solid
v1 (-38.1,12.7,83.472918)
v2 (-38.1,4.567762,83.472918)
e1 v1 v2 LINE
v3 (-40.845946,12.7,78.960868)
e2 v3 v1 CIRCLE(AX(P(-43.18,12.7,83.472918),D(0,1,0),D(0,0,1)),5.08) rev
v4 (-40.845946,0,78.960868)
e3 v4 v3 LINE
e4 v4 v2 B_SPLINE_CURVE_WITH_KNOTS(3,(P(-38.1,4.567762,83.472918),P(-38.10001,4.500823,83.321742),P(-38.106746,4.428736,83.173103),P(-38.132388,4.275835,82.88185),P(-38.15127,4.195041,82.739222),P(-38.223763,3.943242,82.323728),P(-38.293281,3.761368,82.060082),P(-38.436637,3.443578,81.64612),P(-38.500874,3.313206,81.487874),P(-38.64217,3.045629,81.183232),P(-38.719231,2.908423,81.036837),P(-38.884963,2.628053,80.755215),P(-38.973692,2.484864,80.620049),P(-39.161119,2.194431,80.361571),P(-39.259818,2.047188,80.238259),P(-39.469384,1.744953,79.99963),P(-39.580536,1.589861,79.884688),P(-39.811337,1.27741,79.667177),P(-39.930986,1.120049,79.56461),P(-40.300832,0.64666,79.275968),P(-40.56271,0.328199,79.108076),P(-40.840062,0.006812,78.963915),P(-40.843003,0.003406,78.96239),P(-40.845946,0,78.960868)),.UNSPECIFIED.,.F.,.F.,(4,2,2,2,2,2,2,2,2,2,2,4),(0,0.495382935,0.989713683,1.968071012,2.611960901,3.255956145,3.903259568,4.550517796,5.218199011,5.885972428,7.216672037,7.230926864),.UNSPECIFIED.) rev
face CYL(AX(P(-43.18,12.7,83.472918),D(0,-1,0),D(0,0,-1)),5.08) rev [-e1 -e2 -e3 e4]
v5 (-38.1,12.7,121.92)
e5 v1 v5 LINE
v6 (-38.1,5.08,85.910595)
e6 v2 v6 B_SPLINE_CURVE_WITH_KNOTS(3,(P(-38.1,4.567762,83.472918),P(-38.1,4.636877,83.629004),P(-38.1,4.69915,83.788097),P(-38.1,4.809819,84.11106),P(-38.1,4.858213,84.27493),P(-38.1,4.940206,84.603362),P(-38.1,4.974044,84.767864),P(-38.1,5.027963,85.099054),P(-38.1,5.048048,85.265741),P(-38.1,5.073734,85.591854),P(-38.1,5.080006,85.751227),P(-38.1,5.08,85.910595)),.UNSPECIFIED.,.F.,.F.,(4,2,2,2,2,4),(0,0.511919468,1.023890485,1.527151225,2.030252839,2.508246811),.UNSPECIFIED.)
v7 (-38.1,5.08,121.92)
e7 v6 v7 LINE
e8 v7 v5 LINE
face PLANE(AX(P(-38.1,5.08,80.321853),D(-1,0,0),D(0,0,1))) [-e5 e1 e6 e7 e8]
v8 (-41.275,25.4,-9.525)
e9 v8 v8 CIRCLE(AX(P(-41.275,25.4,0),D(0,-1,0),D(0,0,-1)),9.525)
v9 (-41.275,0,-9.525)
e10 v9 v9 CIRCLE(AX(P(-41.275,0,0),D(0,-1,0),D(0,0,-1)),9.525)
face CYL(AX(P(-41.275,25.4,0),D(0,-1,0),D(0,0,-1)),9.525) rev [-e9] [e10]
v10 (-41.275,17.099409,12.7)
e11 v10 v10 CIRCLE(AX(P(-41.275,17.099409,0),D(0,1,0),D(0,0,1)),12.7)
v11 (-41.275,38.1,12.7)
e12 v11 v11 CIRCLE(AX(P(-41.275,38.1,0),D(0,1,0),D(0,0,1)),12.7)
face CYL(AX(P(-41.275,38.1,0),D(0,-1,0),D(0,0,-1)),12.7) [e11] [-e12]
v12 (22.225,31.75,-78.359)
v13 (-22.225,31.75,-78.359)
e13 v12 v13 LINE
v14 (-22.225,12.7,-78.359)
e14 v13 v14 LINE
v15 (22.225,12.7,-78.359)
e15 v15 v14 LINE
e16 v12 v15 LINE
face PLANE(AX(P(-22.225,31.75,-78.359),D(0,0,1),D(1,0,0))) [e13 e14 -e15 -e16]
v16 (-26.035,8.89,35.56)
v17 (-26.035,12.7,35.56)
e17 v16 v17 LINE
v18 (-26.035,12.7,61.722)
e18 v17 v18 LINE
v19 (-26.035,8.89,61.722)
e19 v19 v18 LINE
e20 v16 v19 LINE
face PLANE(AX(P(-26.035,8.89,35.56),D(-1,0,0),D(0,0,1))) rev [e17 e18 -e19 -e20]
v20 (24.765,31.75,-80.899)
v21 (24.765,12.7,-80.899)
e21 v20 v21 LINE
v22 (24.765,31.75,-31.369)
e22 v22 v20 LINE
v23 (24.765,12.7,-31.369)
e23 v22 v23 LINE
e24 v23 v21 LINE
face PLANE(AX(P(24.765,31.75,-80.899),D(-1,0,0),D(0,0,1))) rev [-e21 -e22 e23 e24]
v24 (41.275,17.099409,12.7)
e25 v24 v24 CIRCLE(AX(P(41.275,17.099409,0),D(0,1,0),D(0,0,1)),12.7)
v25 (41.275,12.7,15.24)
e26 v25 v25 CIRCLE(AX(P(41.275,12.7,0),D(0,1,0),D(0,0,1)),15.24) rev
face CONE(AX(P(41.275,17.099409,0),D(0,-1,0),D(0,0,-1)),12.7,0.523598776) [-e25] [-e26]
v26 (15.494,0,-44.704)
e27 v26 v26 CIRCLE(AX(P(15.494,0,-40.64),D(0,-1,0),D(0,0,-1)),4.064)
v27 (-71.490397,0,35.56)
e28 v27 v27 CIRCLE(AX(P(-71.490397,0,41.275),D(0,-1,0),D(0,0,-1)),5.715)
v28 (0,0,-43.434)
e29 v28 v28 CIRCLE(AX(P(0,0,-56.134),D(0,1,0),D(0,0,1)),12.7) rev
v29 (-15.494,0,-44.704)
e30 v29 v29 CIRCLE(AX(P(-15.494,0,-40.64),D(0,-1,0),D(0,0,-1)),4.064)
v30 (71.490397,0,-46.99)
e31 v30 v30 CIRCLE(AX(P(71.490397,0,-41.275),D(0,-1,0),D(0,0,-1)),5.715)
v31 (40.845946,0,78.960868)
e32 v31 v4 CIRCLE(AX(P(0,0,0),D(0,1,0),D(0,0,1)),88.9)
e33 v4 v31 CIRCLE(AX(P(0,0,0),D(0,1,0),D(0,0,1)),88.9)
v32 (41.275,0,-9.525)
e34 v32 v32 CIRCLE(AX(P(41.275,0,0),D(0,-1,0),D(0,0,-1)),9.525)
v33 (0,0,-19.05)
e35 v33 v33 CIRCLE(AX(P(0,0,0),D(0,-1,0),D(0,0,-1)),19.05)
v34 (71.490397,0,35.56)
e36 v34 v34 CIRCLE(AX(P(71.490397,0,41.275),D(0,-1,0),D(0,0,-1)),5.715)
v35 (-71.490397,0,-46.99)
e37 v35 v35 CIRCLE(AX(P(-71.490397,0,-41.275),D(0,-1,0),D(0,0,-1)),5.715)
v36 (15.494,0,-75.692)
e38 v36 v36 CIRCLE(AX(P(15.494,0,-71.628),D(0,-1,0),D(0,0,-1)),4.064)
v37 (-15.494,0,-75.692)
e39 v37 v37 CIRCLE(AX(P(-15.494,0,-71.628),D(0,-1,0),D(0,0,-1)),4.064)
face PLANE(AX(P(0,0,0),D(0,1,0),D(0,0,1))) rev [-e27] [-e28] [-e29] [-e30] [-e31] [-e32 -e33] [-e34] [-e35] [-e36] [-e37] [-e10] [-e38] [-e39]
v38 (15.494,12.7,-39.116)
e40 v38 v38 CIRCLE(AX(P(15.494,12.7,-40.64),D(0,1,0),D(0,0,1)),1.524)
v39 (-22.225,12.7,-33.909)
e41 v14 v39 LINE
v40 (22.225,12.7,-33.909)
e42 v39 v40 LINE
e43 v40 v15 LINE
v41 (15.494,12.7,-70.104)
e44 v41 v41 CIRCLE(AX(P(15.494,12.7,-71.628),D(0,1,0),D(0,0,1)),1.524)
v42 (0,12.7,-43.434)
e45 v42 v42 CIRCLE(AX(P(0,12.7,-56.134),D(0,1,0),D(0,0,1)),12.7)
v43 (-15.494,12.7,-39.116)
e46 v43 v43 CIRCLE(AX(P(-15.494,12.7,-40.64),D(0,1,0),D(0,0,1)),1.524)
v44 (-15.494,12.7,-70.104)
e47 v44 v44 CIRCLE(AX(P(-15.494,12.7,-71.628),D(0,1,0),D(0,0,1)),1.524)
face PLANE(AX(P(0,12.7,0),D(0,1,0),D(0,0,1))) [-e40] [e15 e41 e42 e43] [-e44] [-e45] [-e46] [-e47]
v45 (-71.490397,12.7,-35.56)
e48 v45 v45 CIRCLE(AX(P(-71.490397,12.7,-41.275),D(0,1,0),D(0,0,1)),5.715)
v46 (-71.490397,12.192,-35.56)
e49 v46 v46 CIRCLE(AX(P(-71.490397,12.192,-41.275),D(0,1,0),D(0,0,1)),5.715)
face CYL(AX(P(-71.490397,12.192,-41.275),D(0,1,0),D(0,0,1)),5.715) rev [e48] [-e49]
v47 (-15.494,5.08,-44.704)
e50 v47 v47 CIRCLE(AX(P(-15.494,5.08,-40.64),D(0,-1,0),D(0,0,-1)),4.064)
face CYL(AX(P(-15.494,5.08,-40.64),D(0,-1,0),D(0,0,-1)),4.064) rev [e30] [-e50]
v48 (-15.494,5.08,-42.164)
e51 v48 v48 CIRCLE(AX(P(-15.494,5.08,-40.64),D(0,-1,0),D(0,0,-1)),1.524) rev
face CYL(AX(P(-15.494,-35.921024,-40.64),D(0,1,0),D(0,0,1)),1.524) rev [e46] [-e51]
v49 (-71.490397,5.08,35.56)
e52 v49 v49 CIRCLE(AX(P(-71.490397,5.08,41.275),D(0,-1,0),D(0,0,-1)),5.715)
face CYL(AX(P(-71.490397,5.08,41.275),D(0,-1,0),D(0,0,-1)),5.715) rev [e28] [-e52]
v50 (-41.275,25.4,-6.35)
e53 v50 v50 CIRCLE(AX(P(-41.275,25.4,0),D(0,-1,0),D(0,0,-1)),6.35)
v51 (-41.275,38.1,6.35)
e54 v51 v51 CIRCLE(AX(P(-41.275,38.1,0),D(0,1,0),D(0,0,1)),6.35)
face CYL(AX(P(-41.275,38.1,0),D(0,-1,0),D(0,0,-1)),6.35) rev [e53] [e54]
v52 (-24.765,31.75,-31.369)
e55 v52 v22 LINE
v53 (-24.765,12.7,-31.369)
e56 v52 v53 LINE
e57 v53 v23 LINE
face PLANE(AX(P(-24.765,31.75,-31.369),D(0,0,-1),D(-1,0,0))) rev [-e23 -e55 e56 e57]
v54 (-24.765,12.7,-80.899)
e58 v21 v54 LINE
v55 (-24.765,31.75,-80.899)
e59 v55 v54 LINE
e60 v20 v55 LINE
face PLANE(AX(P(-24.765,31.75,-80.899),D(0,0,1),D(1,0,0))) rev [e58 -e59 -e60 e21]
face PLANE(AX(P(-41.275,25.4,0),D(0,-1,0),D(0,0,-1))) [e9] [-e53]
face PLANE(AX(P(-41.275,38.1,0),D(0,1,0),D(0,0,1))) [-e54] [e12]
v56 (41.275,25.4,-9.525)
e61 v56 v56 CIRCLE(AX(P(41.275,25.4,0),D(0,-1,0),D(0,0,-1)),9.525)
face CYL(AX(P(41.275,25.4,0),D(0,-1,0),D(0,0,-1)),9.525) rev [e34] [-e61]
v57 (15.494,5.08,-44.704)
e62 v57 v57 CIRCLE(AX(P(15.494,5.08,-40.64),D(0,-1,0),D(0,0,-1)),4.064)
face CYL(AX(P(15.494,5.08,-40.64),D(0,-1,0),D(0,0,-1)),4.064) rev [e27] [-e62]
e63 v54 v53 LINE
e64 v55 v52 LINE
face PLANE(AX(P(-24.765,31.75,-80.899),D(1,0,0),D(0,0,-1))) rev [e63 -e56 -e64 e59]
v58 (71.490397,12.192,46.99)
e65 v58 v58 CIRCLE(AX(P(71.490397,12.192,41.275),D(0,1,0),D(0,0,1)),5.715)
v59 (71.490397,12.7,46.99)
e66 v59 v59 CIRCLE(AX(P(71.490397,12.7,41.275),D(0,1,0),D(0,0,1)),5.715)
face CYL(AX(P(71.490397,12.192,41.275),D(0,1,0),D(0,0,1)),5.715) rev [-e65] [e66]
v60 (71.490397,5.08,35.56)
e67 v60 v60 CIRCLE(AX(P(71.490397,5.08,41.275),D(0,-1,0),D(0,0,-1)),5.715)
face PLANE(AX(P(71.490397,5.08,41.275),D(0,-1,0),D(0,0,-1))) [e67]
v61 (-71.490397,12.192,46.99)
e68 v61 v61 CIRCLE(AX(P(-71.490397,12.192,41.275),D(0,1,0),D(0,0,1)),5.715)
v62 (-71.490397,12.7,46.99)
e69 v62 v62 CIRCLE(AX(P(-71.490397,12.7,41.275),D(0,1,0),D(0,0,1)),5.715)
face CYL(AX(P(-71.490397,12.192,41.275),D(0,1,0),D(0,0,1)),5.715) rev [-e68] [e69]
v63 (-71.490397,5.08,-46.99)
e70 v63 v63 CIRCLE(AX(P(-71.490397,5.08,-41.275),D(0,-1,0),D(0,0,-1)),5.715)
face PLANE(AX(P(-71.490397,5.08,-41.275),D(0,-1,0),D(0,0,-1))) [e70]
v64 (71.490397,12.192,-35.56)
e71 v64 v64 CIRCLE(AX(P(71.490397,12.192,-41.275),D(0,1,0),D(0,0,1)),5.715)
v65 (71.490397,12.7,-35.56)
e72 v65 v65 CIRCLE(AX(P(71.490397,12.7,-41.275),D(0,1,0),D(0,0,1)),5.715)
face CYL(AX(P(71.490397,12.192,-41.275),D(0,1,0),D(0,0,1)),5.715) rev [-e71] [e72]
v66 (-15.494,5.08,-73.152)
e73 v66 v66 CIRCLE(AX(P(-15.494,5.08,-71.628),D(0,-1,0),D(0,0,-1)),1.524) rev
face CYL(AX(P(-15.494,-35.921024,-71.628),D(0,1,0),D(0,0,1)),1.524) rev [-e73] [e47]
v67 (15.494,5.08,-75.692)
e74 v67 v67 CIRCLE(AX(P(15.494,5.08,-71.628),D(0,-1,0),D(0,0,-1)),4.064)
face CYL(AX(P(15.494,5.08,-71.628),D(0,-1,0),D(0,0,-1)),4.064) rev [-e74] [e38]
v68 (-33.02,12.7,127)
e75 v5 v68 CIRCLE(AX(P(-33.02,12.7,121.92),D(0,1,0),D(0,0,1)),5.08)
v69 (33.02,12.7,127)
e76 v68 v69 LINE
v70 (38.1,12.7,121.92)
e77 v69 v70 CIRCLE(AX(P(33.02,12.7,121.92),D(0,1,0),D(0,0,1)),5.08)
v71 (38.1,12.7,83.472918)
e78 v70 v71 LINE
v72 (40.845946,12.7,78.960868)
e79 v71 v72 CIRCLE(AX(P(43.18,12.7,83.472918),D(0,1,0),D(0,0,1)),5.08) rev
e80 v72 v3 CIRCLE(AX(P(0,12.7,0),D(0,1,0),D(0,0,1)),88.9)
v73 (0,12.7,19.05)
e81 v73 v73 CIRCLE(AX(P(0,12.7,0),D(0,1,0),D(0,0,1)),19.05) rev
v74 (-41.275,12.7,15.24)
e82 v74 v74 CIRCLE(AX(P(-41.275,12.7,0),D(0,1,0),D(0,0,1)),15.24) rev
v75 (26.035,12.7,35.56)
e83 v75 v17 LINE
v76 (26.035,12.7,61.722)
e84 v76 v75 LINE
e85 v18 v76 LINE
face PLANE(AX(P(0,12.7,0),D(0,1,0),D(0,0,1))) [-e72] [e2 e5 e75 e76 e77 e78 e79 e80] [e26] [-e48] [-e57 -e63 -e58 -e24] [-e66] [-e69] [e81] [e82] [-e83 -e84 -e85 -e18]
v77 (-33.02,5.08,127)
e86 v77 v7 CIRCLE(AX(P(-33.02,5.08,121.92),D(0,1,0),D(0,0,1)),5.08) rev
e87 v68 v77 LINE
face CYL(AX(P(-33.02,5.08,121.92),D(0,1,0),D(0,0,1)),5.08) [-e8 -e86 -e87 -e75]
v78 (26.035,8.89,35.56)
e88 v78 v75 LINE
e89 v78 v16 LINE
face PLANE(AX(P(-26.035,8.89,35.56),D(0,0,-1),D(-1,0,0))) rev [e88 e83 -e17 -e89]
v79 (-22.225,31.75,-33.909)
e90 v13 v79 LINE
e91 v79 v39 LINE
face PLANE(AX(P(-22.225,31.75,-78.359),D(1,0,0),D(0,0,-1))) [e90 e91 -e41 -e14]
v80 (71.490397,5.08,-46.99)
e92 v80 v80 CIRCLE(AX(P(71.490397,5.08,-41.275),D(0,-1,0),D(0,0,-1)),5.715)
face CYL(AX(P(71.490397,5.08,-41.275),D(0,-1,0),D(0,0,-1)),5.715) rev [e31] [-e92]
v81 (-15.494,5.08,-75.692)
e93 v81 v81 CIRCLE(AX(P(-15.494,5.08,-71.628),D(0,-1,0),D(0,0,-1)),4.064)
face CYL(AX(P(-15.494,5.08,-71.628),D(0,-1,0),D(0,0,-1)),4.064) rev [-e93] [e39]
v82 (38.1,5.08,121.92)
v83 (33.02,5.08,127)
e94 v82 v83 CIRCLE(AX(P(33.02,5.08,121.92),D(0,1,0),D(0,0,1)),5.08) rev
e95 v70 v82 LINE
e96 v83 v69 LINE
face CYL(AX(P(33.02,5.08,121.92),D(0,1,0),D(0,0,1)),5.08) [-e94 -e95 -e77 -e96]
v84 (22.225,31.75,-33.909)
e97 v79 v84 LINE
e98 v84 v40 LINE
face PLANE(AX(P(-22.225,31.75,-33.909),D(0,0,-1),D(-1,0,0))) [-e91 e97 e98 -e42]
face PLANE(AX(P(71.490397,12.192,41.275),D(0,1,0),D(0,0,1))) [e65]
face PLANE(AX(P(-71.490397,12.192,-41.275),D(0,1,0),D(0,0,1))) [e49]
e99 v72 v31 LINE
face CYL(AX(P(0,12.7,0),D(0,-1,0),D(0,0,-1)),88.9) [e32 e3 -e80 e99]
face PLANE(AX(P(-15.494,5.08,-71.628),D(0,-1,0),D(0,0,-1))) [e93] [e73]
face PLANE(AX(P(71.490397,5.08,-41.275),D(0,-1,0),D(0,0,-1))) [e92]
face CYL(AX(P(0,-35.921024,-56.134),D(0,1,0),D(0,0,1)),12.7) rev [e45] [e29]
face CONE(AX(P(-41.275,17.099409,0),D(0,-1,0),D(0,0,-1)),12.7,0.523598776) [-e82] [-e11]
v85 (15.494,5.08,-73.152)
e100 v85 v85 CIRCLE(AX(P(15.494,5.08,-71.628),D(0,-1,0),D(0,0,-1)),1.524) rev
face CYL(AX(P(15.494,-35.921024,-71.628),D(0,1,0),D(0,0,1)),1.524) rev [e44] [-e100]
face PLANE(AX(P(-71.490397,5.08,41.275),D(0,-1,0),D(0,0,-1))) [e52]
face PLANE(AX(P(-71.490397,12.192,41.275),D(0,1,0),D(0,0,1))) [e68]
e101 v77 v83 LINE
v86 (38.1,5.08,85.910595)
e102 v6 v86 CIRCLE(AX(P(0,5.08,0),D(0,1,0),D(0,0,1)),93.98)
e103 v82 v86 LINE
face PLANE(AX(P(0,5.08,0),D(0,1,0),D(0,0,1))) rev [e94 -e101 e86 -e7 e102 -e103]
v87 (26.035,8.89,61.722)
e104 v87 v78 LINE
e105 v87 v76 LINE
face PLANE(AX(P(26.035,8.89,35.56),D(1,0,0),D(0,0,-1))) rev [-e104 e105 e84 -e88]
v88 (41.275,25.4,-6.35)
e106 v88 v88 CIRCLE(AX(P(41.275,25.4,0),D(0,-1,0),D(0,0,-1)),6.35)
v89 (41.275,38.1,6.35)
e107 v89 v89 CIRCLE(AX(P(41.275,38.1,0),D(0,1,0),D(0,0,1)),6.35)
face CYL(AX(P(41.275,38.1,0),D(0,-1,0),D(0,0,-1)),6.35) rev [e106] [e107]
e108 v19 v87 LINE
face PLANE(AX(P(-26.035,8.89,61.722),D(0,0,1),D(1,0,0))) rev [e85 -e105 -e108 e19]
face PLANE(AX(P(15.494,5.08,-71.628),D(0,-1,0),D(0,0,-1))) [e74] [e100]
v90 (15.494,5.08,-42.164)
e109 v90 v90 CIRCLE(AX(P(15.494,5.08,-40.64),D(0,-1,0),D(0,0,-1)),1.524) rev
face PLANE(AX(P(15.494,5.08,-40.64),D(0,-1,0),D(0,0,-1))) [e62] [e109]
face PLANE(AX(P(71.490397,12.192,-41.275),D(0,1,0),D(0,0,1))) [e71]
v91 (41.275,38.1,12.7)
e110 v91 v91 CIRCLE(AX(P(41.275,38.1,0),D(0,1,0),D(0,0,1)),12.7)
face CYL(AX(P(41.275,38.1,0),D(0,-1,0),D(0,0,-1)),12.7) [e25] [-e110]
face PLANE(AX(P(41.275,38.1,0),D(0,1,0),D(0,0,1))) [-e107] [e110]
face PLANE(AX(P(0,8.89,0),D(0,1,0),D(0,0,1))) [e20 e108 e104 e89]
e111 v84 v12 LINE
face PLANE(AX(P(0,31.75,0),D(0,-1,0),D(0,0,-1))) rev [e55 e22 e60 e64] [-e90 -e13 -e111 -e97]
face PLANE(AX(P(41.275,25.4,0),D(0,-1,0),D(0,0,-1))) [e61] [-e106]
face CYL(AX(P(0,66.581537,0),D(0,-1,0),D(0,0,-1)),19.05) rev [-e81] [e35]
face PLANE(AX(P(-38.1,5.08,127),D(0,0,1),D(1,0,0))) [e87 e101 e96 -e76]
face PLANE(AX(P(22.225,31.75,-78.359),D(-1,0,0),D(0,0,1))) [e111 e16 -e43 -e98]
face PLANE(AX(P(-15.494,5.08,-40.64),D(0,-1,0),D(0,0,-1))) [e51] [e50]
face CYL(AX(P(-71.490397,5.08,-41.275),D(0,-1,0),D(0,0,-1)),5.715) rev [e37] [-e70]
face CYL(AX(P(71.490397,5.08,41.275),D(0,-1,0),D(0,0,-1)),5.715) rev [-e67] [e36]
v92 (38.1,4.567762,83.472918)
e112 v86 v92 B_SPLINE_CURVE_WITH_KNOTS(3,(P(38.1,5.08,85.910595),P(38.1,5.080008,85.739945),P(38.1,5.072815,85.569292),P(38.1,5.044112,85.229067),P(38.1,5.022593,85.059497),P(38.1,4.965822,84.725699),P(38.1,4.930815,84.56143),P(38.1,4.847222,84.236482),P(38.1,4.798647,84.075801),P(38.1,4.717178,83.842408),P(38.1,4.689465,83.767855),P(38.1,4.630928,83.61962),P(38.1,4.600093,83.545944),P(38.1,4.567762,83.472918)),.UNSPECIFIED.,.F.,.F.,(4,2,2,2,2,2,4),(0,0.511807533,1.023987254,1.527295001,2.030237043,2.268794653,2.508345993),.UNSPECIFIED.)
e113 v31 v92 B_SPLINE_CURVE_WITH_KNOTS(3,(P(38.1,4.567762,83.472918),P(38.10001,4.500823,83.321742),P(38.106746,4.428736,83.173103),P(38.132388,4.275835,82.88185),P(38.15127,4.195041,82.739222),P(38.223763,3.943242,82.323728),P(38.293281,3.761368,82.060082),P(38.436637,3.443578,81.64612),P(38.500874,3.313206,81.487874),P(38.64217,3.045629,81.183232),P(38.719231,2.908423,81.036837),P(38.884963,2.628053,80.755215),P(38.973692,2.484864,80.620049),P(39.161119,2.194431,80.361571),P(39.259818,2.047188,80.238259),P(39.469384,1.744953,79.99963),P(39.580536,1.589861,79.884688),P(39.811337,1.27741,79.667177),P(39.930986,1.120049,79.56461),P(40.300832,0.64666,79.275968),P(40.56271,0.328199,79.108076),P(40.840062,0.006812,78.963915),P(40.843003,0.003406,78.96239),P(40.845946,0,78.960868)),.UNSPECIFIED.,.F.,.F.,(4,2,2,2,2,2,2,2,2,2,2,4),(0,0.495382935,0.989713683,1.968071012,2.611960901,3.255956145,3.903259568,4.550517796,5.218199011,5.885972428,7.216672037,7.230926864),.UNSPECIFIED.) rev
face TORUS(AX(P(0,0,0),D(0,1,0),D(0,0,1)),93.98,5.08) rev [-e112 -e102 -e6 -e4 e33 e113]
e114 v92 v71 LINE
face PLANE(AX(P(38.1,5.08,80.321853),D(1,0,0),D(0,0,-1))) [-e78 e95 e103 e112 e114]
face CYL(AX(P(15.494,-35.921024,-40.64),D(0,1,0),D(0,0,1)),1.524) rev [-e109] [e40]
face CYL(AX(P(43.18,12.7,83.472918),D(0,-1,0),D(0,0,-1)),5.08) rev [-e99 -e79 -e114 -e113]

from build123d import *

# Parameters (mm, degrees)
SKETCH1_R           = 88.9
BOSS_EXTRUDE1_DEPTH = 12.7
SKETCH9_W           = 49.53
SKETCH9_H           = 49.53
SKETCH9_W_2         = 44.45
SKETCH9_H_2         = 44.45
BOSS_EXTRUDE2_DEPTH = 19.05
SKETCH10_R          = 5.715
CUT_EXTRUDE7_DEPTH  = 0.508
SKETCH14_R          = 19.05
CUT_EXTRUDE11_DEPTH = 12.7
SKETCH15_R          = 12.7
SKETCH15_R_2        = 6.35
BOSS_EXTRUDE3_DEPTH = 25.4
CUT_EXTRUDE12_START = -12.7
SKETCH16_R          = 6.35
CUT_EXTRUDE12_DEPTH = 12.7
SKETCH17_R          = 9.525
CUT_EXTRUDE13_DEPTH = 25.4
CHAMFER2_SIZE       = 2.54
CHAMFER2_SIZE2      = 4.399409051
SKETCH19_R          = 12.7
SKETCH19_R_2        = 1.524
CUT_EXTRUDE14_DEPTH = 12.7
CUT_EXTRUDE15_START = -5.08
SKETCH21_R          = 4.064
SKETCH21_R_2        = 5.715
CUT_EXTRUDE15_DEPTH = 5.08
SKETCH22_W          = 52.07
SKETCH22_H          = 26.162
CUT_EXTRUDE17_DEPTH = 3.81
BOSS_EXTRUDE5_START = -7.62
BOSS_EXTRUDE5_DEPTH = 7.62
FILLET2_R           = 5.08


with BuildPart() as part:
    # Sketch1 → Boss-Extrude1 (new body)
    with BuildSketch(Plane(origin=(0, 0, 0), x_dir=(1, 0, 0), z_dir=(0, 1, 0))):
        with Locations(Location((0, 0, 0), (0, 0, 270))):
            Circle(SKETCH1_R)
    extrude(amount=BOSS_EXTRUDE1_DEPTH)

    # Sketch9 → Boss-Extrude2 (add)
    with BuildSketch(Plane(origin=(0, 12.7, 0), x_dir=(1, 0, 0), z_dir=(0, 1, 0))):
        with Locations((0, 56.134)):
            Rectangle(SKETCH9_W, SKETCH9_H)
        with Locations((0, 56.134)):
            Rectangle(SKETCH9_W_2, SKETCH9_H_2, mode=Mode.SUBTRACT)
    extrude(amount=BOSS_EXTRUDE2_DEPTH)

    # Sketch10 → Cut-Extrude7 (cut)
    with BuildSketch(Plane(origin=(0, 12.7, 0), x_dir=(1, 0, 0), z_dir=(0, 1, 0))):
        with Locations(Location((-71.490397082, -41.275, 0), (0, 0, 270))):
            Circle(SKETCH10_R)
        with Locations(Location((-71.490397082, 41.275, 0), (0, 0, 270))):
            Circle(SKETCH10_R)
        with Locations(Location((71.490397082, 41.275, 0), (0, 0, 270))):
            Circle(SKETCH10_R)
        with Locations(Location((71.490397082, -41.275, 0), (0, 0, 270))):
            Circle(SKETCH10_R)
    extrude(amount=-CUT_EXTRUDE7_DEPTH, mode=Mode.SUBTRACT)

    # Sketch14 → Cut-Extrude11 (cut)
    with BuildSketch(Plane.XZ):
        with Locations(Location((0, 0, 0), (0, 0, 270))):
            Circle(SKETCH14_R)
    extrude(amount=-CUT_EXTRUDE11_DEPTH, mode=Mode.SUBTRACT)

    # Sketch15 → Boss-Extrude3 (add)
    # profile 1 of 2: a face of its own
    with BuildSketch(Plane(origin=(0, 12.7, 0), x_dir=(1, 0, 0), z_dir=(0, 1, 0))):
        with Locations(Location((-41.275, 0, 0), (0, 0, 270))):
            Circle(SKETCH15_R)
        with Locations(Location((-41.275, 0, 0), (0, 0, 270))):
            Circle(SKETCH15_R_2, mode=Mode.SUBTRACT)
    # profile 2 of 2: a face of its own
    with BuildSketch(Plane(origin=(0, 12.7, 0), x_dir=(1, 0, 0), z_dir=(0, 1, 0))):
        with Locations(Location((41.275, 0, 0), (0, 0, 270))):
            Circle(SKETCH15_R)
        with Locations(Location((41.275, 0, 0), (0, 0, 270))):
            Circle(SKETCH15_R_2, mode=Mode.SUBTRACT)
    extrude(amount=BOSS_EXTRUDE3_DEPTH)

    # Sketch16 → Cut-Extrude12 (cut)
    with BuildSketch(Plane(origin=(0, 12.7, 0), x_dir=(1, 0, 0), z_dir=(0, 1, 0)).offset(CUT_EXTRUDE12_START)):
        with Locations(Location((41.275, 0, 0), (0, 0, 270))):
            Circle(SKETCH16_R)
        with Locations(Location((-41.275, 0, 0), (0, 0, 270))):
            Circle(SKETCH16_R)
    extrude(amount=CUT_EXTRUDE12_DEPTH, mode=Mode.SUBTRACT)

    # Sketch17 → Cut-Extrude13 (cut)
    with BuildSketch(Plane.XZ):
        with Locations(Location((41.275, 0, 0), (0, 0, 270))):
            Circle(SKETCH17_R)
        with Locations(Location((-41.275, 0, 0), (0, 0, 270))):
            Circle(SKETCH17_R)
    extrude(amount=-CUT_EXTRUDE13_DEPTH, mode=Mode.SUBTRACT)

    # Chamfer2
    chamfer2_edges = [part.edges().sort_by_distance(p)[0] for p in [
        (-41.275, 12.7, -12.7),
        (41.275, 12.7, -12.7),
    ]]
    chamfer2_side = [part.faces().sort_by_distance(p)[0] for p in [
        (0, 12.7, -86.385528286),
    ]]
    chamfer(chamfer2_edges, length=CHAMFER2_SIZE, length2=CHAMFER2_SIZE2, reference=chamfer2_side[0])

    # Sketch19 → Cut-Extrude14 (cut)
    with BuildSketch(Plane(origin=(0, 12.7, 0), x_dir=(1, 0, 0), z_dir=(0, 1, 0))):
        with Locations(Location((0, 56.134, 0), (0, 0, 270))):
            Circle(SKETCH19_R)
        with Locations(Location((15.494, 71.628, 0), (0, 0, 270))):
            Circle(SKETCH19_R_2)
        with Locations(Location((15.494, 40.64, 0), (0, 0, 270))):
            Circle(SKETCH19_R_2)
        with Locations(Location((-15.494, 40.64, 0), (0, 0, 270))):
            Circle(SKETCH19_R_2)
        with Locations(Location((-15.494, 71.628, 0), (0, 0, 270))):
            Circle(SKETCH19_R_2)
    extrude(amount=-CUT_EXTRUDE14_DEPTH, mode=Mode.SUBTRACT)

    # Sketch21 → Cut-Extrude15 (cut)
    with BuildSketch(Plane.XZ.offset(CUT_EXTRUDE15_START)):
        with Locations(Location((-15.494, -71.628, 0), (0, 0, 270))):
            Circle(SKETCH21_R)
        with Locations(Location((15.494, -71.628, 0), (0, 0, 270))):
            Circle(SKETCH21_R)
        with Locations(Location((15.494, -40.64, 0), (0, 0, 270))):
            Circle(SKETCH21_R)
        with Locations(Location((-15.494, -40.64, 0), (0, 0, 270))):
            Circle(SKETCH21_R)
        with Locations(Location((-71.490397082, 41.275, 0), (0, 0, 90))):
            Circle(SKETCH21_R_2)
        with Locations(Location((71.490397082, 41.275, 0), (0, 0, 90))):
            Circle(SKETCH21_R_2)
        with Locations(Location((71.490397082, -41.275, 0), (0, 0, 90))):
            Circle(SKETCH21_R_2)
        with Locations(Location((-71.490397082, -41.275, 0), (0, 0, 90))):
            Circle(SKETCH21_R_2)
    extrude(amount=CUT_EXTRUDE15_DEPTH, mode=Mode.SUBTRACT)

    # Sketch22 → Cut-Extrude17 (cut)
    with BuildSketch(Plane(origin=(0, 12.7, 0), x_dir=(1, 0, 0), z_dir=(0, 1, 0))):
        with Locations((0, -48.641)):
            Rectangle(SKETCH22_W, SKETCH22_H)
    extrude(amount=-CUT_EXTRUDE17_DEPTH, mode=Mode.SUBTRACT)

    # Sketch23 → Boss-Extrude5 (add)
    with BuildSketch(Plane(origin=(0, 12.7, 0), x_dir=(1, 0, 0), z_dir=(0, 1, 0)).offset(BOSS_EXTRUDE5_START)):
        with BuildLine():
            Line((-38.1, -80.321852568), (-38.1, -127))
            Line((-38.1, -127), (38.1, -127))
            Line((38.1, -127), (38.1, -80.321852568))
            ThreePointArc((38.1, -80.321852568), (0, -88.9), (-38.1, -80.321852568))
        make_face()
    extrude(amount=BOSS_EXTRUDE5_DEPTH)

    # Fillet2
    fillet2_edges = [part.edges().sort_by_distance(p)[0] for p in [
        (-19.526870034, 5.08, 86.728953335),
        (-38.1, 8.89, 80.321852568),
        (38.1, 8.89, 80.321852568),
        (38.1, 8.89, 127),
        (-38.1, 8.89, 127),
    ]]
    fillet(fillet2_edges, radius=FILLET2_R - 0.0001)  # a hair under: the kernel refuses the full size


solid = part.part
